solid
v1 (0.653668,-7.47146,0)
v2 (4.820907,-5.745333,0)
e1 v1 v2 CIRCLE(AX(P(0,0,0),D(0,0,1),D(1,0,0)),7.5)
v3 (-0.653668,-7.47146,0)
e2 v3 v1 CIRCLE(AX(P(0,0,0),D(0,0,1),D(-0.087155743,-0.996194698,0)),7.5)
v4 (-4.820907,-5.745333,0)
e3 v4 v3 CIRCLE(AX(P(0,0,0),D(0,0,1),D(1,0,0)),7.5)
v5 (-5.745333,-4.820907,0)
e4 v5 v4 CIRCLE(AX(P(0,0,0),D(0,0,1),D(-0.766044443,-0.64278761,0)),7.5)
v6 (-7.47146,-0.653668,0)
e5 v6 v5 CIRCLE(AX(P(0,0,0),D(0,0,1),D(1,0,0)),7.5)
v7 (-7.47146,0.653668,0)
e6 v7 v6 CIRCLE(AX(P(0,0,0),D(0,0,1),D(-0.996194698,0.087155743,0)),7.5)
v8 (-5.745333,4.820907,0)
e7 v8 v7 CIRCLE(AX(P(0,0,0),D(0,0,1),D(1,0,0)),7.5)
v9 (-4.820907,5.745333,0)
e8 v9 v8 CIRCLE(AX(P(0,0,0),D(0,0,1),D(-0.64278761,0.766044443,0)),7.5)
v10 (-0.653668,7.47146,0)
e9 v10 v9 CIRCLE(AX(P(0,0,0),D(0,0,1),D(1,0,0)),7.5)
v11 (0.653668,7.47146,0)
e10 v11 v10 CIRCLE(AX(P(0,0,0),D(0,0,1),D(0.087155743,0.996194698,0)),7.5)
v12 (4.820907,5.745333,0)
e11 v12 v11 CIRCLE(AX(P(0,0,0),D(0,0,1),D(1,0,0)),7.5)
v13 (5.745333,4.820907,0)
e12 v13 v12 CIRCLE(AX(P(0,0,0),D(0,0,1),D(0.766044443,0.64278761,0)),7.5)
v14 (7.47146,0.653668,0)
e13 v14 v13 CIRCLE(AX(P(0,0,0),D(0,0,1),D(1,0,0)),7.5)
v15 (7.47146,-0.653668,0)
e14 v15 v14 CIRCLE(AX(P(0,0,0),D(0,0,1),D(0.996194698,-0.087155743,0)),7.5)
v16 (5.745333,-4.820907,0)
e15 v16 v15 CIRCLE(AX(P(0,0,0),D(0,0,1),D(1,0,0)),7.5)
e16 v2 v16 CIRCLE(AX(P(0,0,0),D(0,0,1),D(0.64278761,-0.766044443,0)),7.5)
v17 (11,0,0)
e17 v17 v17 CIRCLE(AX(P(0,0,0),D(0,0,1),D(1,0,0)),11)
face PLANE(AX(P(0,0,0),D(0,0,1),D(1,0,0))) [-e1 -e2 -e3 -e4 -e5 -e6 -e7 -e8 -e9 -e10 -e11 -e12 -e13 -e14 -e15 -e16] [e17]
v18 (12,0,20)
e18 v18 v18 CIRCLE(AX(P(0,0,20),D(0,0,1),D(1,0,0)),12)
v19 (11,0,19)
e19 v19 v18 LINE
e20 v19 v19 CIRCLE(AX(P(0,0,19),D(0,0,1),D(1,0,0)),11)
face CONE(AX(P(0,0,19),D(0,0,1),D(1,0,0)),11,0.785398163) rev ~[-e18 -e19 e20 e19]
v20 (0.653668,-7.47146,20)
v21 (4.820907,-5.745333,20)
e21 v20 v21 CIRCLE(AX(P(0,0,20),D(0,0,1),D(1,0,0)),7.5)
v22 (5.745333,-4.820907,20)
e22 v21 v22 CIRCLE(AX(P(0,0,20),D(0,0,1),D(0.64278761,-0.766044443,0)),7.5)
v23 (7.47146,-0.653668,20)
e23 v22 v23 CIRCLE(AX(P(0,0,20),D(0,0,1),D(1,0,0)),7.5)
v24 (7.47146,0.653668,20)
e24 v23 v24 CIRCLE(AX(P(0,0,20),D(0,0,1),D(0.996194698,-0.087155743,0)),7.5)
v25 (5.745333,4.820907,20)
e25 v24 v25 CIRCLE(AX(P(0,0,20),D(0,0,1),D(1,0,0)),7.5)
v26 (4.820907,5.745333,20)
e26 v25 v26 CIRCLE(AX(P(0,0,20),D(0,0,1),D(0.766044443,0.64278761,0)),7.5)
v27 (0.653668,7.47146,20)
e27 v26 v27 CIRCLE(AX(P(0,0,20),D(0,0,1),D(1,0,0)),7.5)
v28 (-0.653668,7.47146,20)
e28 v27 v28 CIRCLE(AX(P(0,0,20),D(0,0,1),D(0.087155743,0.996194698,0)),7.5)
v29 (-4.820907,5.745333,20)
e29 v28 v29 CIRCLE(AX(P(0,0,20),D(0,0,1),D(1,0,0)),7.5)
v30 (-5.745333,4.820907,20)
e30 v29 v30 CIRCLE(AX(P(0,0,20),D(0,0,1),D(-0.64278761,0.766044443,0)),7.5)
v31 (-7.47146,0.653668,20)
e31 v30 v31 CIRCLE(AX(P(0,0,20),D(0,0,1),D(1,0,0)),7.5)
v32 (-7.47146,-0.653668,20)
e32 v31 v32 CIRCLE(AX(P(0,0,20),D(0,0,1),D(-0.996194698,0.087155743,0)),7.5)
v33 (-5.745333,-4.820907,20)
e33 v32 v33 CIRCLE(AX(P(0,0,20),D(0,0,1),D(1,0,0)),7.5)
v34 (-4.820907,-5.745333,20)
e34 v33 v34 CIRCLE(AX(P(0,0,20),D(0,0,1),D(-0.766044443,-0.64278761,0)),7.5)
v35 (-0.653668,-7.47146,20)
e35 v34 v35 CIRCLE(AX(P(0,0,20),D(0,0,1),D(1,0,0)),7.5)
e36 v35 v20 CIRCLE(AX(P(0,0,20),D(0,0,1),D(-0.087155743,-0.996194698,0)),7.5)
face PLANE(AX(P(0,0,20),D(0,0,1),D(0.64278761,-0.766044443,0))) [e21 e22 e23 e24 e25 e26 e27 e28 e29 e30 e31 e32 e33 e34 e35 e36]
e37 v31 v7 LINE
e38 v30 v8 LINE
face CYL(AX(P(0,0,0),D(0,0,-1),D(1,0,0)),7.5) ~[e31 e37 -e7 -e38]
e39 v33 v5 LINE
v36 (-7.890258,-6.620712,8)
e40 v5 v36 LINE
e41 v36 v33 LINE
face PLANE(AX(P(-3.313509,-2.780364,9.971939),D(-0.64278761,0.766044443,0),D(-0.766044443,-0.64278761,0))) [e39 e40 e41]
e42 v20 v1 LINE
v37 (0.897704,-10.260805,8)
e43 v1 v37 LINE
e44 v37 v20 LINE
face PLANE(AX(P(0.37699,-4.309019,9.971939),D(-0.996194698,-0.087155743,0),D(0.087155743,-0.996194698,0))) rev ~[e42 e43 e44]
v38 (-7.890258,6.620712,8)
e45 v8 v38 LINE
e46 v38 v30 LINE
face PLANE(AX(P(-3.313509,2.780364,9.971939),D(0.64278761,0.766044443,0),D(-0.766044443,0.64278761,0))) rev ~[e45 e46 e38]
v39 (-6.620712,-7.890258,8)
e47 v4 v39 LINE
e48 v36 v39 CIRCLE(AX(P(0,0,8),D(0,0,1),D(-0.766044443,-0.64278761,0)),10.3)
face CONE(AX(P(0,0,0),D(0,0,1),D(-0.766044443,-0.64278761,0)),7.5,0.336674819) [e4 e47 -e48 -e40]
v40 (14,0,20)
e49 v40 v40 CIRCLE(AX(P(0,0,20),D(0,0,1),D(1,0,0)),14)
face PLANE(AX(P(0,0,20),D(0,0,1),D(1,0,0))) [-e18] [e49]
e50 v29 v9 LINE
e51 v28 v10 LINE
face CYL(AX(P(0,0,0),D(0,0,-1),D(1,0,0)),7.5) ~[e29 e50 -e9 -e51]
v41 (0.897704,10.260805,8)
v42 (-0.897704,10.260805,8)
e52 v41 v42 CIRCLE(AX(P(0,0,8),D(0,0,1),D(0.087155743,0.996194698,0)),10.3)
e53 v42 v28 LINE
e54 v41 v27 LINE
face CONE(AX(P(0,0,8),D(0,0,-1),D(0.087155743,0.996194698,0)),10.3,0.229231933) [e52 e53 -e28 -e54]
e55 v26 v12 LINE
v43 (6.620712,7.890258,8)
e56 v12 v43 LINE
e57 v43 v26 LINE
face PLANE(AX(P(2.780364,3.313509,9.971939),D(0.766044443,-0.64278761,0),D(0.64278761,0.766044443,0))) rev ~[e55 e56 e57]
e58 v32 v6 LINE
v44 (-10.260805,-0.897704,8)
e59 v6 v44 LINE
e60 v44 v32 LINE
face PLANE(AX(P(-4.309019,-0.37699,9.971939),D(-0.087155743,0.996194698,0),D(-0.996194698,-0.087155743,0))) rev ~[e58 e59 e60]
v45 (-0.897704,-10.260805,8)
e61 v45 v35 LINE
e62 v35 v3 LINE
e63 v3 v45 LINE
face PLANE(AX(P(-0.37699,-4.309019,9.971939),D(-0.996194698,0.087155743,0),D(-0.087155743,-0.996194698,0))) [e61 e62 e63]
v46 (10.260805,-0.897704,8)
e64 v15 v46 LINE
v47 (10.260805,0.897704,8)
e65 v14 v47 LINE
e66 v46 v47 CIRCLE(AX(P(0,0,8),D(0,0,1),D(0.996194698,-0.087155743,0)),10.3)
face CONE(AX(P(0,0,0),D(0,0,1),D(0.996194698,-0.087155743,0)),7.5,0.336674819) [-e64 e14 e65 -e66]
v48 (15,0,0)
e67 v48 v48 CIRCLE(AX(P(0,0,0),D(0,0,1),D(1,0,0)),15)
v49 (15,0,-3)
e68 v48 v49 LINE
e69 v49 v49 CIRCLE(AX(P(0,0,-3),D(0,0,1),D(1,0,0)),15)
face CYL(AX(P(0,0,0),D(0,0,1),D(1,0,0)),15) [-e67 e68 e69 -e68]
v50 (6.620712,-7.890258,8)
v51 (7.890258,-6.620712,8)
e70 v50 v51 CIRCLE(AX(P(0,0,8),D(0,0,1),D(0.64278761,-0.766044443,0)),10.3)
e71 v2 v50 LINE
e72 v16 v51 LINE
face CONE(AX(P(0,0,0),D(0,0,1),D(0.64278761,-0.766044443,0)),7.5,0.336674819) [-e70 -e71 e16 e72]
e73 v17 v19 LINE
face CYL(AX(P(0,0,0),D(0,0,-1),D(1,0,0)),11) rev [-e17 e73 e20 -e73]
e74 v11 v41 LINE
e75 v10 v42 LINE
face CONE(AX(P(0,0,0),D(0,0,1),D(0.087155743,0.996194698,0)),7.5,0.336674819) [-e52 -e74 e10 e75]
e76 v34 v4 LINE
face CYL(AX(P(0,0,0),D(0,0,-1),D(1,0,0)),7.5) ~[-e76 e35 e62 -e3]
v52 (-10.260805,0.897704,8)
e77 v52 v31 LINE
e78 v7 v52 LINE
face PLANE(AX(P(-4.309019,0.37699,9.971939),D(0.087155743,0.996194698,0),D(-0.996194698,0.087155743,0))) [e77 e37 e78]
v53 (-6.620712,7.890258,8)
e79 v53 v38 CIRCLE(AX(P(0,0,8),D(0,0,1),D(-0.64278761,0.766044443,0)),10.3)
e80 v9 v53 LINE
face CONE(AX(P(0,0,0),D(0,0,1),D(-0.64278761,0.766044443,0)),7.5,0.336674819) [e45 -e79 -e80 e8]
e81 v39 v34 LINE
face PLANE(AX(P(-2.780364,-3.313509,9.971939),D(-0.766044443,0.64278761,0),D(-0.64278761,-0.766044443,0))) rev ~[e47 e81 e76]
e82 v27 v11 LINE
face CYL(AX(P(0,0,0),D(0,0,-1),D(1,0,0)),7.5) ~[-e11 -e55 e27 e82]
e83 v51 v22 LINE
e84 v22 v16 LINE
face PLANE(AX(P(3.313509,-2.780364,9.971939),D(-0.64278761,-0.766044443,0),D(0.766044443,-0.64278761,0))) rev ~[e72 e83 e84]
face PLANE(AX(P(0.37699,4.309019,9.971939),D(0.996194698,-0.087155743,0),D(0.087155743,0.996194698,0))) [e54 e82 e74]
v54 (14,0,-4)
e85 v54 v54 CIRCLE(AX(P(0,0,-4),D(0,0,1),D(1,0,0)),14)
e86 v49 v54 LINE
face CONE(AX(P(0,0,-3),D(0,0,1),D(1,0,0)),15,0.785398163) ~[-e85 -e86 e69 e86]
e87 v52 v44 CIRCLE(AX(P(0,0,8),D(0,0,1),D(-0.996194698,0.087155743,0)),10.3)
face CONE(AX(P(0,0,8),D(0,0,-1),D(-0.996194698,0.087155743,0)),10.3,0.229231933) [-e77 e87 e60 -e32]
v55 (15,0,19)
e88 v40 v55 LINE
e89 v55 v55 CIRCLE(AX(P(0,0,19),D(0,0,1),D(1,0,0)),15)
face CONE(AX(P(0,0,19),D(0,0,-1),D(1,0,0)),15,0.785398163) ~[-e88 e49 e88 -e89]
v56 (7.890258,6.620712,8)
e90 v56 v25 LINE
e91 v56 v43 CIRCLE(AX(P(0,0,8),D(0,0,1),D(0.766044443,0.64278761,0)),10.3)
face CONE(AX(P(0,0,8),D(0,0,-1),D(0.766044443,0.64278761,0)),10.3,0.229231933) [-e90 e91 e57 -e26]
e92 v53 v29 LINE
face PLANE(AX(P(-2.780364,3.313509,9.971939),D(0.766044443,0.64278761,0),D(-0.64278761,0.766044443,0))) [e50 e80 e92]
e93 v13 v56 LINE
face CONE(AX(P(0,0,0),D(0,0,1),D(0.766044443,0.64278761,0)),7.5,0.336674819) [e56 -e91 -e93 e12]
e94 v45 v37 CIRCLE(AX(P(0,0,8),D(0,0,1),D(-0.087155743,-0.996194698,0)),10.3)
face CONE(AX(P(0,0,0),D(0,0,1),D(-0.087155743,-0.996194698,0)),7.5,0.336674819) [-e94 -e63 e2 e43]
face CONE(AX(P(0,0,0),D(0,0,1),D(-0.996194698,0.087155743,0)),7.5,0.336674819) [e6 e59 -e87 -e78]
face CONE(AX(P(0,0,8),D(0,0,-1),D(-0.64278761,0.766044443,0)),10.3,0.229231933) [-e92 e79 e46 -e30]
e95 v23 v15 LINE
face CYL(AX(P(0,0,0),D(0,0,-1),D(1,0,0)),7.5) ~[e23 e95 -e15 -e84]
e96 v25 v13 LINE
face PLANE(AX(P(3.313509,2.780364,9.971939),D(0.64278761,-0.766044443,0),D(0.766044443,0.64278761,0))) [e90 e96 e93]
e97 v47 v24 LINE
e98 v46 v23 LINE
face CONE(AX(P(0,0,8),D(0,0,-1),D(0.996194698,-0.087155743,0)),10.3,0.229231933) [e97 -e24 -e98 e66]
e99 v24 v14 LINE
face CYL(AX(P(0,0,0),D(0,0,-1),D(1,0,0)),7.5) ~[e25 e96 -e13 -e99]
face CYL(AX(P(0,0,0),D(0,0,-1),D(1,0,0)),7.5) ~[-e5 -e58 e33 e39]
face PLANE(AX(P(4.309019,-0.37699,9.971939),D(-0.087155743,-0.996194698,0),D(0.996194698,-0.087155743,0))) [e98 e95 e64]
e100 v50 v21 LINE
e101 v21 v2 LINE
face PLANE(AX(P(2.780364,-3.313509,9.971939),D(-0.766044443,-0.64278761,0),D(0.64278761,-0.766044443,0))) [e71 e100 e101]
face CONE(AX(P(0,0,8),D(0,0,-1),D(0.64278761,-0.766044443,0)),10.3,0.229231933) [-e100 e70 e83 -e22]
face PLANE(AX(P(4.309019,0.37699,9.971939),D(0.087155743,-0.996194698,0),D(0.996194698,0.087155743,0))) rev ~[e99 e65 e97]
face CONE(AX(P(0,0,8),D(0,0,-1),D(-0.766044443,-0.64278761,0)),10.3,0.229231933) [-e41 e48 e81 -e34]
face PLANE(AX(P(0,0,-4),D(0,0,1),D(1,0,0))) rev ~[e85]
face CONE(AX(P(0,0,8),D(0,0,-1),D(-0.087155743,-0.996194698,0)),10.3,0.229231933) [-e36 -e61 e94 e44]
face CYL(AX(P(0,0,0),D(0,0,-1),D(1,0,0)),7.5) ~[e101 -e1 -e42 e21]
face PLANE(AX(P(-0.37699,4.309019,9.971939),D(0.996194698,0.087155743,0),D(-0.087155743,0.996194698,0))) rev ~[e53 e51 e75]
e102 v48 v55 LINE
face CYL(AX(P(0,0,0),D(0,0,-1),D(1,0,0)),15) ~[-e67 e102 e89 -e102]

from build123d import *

# Parameters (mm, degrees)
F0_R            = 15
F0_R_2          = 11
F0_R_3          = 7.5
F1_DEPTH        = 4
F2_DEPTH        = 20
F4_ANGLE_BACK   = 5
F4_ANGLE        = 10
F4_COPIES_COUNT = 8
F5_SIZE         = 1


# Not quite as in the source:
# - a pattern or mirror of a feature is missing from the dataset's text; its kind, count and spacing are read off the source's solid


with BuildPart() as f1:
    # F0 (on Top) → F1 (new body)
    with BuildSketch(Plane.XY):
        Circle(F0_R)
        Circle(F0_R_2, mode=Mode.SUBTRACT)
        Circle(F0_R_2)
        Circle(F0_R_3, mode=Mode.SUBTRACT)
        Circle(F0_R_3)
    extrude(amount=-F1_DEPTH)

    # F0 (on Top) → F2 (join)
    with BuildSketch(Plane.XY):
        Circle(F0_R)
        Circle(F0_R_2, mode=Mode.SUBTRACT)
        Circle(F0_R_3)
    extrude(amount=F2_DEPTH)

    # F3 (on Front) → F4 (revolve)
    with BuildSketch(Plane.XZ, mode=Mode.PRIVATE) as f4_sk:
        Polygon((0, 20), (0, 0), (7.5, 0), (10.3, 8), (7.5, 20), align=None)
    f4 = revolve(f4_sk.sketch.rotate(Axis((0, 0, 10), (0, 0, 1)), -F4_ANGLE_BACK), axis=Axis((0, 0, 10), (0, 0, 1)), revolution_arc=F4_ANGLE)

    # F4_copies: F4 ×8 about axis
    f4_copies_axis = Axis((0, 0, 0), (0, 0, 1))
    for i in range(1, F4_COPIES_COUNT):
        add(f4.rotate(f4_copies_axis, i * 360 / F4_COPIES_COUNT))

    # F5
    f5_edges = [f1.edges().sort_by_distance(p)[0] for p in [
        (-15, 0, 20),
        (-11, 0, 20),
        (-15, 0, -4),
    ]]
    chamfer(f5_edges, length=F5_SIZE)


solid = f1.part
